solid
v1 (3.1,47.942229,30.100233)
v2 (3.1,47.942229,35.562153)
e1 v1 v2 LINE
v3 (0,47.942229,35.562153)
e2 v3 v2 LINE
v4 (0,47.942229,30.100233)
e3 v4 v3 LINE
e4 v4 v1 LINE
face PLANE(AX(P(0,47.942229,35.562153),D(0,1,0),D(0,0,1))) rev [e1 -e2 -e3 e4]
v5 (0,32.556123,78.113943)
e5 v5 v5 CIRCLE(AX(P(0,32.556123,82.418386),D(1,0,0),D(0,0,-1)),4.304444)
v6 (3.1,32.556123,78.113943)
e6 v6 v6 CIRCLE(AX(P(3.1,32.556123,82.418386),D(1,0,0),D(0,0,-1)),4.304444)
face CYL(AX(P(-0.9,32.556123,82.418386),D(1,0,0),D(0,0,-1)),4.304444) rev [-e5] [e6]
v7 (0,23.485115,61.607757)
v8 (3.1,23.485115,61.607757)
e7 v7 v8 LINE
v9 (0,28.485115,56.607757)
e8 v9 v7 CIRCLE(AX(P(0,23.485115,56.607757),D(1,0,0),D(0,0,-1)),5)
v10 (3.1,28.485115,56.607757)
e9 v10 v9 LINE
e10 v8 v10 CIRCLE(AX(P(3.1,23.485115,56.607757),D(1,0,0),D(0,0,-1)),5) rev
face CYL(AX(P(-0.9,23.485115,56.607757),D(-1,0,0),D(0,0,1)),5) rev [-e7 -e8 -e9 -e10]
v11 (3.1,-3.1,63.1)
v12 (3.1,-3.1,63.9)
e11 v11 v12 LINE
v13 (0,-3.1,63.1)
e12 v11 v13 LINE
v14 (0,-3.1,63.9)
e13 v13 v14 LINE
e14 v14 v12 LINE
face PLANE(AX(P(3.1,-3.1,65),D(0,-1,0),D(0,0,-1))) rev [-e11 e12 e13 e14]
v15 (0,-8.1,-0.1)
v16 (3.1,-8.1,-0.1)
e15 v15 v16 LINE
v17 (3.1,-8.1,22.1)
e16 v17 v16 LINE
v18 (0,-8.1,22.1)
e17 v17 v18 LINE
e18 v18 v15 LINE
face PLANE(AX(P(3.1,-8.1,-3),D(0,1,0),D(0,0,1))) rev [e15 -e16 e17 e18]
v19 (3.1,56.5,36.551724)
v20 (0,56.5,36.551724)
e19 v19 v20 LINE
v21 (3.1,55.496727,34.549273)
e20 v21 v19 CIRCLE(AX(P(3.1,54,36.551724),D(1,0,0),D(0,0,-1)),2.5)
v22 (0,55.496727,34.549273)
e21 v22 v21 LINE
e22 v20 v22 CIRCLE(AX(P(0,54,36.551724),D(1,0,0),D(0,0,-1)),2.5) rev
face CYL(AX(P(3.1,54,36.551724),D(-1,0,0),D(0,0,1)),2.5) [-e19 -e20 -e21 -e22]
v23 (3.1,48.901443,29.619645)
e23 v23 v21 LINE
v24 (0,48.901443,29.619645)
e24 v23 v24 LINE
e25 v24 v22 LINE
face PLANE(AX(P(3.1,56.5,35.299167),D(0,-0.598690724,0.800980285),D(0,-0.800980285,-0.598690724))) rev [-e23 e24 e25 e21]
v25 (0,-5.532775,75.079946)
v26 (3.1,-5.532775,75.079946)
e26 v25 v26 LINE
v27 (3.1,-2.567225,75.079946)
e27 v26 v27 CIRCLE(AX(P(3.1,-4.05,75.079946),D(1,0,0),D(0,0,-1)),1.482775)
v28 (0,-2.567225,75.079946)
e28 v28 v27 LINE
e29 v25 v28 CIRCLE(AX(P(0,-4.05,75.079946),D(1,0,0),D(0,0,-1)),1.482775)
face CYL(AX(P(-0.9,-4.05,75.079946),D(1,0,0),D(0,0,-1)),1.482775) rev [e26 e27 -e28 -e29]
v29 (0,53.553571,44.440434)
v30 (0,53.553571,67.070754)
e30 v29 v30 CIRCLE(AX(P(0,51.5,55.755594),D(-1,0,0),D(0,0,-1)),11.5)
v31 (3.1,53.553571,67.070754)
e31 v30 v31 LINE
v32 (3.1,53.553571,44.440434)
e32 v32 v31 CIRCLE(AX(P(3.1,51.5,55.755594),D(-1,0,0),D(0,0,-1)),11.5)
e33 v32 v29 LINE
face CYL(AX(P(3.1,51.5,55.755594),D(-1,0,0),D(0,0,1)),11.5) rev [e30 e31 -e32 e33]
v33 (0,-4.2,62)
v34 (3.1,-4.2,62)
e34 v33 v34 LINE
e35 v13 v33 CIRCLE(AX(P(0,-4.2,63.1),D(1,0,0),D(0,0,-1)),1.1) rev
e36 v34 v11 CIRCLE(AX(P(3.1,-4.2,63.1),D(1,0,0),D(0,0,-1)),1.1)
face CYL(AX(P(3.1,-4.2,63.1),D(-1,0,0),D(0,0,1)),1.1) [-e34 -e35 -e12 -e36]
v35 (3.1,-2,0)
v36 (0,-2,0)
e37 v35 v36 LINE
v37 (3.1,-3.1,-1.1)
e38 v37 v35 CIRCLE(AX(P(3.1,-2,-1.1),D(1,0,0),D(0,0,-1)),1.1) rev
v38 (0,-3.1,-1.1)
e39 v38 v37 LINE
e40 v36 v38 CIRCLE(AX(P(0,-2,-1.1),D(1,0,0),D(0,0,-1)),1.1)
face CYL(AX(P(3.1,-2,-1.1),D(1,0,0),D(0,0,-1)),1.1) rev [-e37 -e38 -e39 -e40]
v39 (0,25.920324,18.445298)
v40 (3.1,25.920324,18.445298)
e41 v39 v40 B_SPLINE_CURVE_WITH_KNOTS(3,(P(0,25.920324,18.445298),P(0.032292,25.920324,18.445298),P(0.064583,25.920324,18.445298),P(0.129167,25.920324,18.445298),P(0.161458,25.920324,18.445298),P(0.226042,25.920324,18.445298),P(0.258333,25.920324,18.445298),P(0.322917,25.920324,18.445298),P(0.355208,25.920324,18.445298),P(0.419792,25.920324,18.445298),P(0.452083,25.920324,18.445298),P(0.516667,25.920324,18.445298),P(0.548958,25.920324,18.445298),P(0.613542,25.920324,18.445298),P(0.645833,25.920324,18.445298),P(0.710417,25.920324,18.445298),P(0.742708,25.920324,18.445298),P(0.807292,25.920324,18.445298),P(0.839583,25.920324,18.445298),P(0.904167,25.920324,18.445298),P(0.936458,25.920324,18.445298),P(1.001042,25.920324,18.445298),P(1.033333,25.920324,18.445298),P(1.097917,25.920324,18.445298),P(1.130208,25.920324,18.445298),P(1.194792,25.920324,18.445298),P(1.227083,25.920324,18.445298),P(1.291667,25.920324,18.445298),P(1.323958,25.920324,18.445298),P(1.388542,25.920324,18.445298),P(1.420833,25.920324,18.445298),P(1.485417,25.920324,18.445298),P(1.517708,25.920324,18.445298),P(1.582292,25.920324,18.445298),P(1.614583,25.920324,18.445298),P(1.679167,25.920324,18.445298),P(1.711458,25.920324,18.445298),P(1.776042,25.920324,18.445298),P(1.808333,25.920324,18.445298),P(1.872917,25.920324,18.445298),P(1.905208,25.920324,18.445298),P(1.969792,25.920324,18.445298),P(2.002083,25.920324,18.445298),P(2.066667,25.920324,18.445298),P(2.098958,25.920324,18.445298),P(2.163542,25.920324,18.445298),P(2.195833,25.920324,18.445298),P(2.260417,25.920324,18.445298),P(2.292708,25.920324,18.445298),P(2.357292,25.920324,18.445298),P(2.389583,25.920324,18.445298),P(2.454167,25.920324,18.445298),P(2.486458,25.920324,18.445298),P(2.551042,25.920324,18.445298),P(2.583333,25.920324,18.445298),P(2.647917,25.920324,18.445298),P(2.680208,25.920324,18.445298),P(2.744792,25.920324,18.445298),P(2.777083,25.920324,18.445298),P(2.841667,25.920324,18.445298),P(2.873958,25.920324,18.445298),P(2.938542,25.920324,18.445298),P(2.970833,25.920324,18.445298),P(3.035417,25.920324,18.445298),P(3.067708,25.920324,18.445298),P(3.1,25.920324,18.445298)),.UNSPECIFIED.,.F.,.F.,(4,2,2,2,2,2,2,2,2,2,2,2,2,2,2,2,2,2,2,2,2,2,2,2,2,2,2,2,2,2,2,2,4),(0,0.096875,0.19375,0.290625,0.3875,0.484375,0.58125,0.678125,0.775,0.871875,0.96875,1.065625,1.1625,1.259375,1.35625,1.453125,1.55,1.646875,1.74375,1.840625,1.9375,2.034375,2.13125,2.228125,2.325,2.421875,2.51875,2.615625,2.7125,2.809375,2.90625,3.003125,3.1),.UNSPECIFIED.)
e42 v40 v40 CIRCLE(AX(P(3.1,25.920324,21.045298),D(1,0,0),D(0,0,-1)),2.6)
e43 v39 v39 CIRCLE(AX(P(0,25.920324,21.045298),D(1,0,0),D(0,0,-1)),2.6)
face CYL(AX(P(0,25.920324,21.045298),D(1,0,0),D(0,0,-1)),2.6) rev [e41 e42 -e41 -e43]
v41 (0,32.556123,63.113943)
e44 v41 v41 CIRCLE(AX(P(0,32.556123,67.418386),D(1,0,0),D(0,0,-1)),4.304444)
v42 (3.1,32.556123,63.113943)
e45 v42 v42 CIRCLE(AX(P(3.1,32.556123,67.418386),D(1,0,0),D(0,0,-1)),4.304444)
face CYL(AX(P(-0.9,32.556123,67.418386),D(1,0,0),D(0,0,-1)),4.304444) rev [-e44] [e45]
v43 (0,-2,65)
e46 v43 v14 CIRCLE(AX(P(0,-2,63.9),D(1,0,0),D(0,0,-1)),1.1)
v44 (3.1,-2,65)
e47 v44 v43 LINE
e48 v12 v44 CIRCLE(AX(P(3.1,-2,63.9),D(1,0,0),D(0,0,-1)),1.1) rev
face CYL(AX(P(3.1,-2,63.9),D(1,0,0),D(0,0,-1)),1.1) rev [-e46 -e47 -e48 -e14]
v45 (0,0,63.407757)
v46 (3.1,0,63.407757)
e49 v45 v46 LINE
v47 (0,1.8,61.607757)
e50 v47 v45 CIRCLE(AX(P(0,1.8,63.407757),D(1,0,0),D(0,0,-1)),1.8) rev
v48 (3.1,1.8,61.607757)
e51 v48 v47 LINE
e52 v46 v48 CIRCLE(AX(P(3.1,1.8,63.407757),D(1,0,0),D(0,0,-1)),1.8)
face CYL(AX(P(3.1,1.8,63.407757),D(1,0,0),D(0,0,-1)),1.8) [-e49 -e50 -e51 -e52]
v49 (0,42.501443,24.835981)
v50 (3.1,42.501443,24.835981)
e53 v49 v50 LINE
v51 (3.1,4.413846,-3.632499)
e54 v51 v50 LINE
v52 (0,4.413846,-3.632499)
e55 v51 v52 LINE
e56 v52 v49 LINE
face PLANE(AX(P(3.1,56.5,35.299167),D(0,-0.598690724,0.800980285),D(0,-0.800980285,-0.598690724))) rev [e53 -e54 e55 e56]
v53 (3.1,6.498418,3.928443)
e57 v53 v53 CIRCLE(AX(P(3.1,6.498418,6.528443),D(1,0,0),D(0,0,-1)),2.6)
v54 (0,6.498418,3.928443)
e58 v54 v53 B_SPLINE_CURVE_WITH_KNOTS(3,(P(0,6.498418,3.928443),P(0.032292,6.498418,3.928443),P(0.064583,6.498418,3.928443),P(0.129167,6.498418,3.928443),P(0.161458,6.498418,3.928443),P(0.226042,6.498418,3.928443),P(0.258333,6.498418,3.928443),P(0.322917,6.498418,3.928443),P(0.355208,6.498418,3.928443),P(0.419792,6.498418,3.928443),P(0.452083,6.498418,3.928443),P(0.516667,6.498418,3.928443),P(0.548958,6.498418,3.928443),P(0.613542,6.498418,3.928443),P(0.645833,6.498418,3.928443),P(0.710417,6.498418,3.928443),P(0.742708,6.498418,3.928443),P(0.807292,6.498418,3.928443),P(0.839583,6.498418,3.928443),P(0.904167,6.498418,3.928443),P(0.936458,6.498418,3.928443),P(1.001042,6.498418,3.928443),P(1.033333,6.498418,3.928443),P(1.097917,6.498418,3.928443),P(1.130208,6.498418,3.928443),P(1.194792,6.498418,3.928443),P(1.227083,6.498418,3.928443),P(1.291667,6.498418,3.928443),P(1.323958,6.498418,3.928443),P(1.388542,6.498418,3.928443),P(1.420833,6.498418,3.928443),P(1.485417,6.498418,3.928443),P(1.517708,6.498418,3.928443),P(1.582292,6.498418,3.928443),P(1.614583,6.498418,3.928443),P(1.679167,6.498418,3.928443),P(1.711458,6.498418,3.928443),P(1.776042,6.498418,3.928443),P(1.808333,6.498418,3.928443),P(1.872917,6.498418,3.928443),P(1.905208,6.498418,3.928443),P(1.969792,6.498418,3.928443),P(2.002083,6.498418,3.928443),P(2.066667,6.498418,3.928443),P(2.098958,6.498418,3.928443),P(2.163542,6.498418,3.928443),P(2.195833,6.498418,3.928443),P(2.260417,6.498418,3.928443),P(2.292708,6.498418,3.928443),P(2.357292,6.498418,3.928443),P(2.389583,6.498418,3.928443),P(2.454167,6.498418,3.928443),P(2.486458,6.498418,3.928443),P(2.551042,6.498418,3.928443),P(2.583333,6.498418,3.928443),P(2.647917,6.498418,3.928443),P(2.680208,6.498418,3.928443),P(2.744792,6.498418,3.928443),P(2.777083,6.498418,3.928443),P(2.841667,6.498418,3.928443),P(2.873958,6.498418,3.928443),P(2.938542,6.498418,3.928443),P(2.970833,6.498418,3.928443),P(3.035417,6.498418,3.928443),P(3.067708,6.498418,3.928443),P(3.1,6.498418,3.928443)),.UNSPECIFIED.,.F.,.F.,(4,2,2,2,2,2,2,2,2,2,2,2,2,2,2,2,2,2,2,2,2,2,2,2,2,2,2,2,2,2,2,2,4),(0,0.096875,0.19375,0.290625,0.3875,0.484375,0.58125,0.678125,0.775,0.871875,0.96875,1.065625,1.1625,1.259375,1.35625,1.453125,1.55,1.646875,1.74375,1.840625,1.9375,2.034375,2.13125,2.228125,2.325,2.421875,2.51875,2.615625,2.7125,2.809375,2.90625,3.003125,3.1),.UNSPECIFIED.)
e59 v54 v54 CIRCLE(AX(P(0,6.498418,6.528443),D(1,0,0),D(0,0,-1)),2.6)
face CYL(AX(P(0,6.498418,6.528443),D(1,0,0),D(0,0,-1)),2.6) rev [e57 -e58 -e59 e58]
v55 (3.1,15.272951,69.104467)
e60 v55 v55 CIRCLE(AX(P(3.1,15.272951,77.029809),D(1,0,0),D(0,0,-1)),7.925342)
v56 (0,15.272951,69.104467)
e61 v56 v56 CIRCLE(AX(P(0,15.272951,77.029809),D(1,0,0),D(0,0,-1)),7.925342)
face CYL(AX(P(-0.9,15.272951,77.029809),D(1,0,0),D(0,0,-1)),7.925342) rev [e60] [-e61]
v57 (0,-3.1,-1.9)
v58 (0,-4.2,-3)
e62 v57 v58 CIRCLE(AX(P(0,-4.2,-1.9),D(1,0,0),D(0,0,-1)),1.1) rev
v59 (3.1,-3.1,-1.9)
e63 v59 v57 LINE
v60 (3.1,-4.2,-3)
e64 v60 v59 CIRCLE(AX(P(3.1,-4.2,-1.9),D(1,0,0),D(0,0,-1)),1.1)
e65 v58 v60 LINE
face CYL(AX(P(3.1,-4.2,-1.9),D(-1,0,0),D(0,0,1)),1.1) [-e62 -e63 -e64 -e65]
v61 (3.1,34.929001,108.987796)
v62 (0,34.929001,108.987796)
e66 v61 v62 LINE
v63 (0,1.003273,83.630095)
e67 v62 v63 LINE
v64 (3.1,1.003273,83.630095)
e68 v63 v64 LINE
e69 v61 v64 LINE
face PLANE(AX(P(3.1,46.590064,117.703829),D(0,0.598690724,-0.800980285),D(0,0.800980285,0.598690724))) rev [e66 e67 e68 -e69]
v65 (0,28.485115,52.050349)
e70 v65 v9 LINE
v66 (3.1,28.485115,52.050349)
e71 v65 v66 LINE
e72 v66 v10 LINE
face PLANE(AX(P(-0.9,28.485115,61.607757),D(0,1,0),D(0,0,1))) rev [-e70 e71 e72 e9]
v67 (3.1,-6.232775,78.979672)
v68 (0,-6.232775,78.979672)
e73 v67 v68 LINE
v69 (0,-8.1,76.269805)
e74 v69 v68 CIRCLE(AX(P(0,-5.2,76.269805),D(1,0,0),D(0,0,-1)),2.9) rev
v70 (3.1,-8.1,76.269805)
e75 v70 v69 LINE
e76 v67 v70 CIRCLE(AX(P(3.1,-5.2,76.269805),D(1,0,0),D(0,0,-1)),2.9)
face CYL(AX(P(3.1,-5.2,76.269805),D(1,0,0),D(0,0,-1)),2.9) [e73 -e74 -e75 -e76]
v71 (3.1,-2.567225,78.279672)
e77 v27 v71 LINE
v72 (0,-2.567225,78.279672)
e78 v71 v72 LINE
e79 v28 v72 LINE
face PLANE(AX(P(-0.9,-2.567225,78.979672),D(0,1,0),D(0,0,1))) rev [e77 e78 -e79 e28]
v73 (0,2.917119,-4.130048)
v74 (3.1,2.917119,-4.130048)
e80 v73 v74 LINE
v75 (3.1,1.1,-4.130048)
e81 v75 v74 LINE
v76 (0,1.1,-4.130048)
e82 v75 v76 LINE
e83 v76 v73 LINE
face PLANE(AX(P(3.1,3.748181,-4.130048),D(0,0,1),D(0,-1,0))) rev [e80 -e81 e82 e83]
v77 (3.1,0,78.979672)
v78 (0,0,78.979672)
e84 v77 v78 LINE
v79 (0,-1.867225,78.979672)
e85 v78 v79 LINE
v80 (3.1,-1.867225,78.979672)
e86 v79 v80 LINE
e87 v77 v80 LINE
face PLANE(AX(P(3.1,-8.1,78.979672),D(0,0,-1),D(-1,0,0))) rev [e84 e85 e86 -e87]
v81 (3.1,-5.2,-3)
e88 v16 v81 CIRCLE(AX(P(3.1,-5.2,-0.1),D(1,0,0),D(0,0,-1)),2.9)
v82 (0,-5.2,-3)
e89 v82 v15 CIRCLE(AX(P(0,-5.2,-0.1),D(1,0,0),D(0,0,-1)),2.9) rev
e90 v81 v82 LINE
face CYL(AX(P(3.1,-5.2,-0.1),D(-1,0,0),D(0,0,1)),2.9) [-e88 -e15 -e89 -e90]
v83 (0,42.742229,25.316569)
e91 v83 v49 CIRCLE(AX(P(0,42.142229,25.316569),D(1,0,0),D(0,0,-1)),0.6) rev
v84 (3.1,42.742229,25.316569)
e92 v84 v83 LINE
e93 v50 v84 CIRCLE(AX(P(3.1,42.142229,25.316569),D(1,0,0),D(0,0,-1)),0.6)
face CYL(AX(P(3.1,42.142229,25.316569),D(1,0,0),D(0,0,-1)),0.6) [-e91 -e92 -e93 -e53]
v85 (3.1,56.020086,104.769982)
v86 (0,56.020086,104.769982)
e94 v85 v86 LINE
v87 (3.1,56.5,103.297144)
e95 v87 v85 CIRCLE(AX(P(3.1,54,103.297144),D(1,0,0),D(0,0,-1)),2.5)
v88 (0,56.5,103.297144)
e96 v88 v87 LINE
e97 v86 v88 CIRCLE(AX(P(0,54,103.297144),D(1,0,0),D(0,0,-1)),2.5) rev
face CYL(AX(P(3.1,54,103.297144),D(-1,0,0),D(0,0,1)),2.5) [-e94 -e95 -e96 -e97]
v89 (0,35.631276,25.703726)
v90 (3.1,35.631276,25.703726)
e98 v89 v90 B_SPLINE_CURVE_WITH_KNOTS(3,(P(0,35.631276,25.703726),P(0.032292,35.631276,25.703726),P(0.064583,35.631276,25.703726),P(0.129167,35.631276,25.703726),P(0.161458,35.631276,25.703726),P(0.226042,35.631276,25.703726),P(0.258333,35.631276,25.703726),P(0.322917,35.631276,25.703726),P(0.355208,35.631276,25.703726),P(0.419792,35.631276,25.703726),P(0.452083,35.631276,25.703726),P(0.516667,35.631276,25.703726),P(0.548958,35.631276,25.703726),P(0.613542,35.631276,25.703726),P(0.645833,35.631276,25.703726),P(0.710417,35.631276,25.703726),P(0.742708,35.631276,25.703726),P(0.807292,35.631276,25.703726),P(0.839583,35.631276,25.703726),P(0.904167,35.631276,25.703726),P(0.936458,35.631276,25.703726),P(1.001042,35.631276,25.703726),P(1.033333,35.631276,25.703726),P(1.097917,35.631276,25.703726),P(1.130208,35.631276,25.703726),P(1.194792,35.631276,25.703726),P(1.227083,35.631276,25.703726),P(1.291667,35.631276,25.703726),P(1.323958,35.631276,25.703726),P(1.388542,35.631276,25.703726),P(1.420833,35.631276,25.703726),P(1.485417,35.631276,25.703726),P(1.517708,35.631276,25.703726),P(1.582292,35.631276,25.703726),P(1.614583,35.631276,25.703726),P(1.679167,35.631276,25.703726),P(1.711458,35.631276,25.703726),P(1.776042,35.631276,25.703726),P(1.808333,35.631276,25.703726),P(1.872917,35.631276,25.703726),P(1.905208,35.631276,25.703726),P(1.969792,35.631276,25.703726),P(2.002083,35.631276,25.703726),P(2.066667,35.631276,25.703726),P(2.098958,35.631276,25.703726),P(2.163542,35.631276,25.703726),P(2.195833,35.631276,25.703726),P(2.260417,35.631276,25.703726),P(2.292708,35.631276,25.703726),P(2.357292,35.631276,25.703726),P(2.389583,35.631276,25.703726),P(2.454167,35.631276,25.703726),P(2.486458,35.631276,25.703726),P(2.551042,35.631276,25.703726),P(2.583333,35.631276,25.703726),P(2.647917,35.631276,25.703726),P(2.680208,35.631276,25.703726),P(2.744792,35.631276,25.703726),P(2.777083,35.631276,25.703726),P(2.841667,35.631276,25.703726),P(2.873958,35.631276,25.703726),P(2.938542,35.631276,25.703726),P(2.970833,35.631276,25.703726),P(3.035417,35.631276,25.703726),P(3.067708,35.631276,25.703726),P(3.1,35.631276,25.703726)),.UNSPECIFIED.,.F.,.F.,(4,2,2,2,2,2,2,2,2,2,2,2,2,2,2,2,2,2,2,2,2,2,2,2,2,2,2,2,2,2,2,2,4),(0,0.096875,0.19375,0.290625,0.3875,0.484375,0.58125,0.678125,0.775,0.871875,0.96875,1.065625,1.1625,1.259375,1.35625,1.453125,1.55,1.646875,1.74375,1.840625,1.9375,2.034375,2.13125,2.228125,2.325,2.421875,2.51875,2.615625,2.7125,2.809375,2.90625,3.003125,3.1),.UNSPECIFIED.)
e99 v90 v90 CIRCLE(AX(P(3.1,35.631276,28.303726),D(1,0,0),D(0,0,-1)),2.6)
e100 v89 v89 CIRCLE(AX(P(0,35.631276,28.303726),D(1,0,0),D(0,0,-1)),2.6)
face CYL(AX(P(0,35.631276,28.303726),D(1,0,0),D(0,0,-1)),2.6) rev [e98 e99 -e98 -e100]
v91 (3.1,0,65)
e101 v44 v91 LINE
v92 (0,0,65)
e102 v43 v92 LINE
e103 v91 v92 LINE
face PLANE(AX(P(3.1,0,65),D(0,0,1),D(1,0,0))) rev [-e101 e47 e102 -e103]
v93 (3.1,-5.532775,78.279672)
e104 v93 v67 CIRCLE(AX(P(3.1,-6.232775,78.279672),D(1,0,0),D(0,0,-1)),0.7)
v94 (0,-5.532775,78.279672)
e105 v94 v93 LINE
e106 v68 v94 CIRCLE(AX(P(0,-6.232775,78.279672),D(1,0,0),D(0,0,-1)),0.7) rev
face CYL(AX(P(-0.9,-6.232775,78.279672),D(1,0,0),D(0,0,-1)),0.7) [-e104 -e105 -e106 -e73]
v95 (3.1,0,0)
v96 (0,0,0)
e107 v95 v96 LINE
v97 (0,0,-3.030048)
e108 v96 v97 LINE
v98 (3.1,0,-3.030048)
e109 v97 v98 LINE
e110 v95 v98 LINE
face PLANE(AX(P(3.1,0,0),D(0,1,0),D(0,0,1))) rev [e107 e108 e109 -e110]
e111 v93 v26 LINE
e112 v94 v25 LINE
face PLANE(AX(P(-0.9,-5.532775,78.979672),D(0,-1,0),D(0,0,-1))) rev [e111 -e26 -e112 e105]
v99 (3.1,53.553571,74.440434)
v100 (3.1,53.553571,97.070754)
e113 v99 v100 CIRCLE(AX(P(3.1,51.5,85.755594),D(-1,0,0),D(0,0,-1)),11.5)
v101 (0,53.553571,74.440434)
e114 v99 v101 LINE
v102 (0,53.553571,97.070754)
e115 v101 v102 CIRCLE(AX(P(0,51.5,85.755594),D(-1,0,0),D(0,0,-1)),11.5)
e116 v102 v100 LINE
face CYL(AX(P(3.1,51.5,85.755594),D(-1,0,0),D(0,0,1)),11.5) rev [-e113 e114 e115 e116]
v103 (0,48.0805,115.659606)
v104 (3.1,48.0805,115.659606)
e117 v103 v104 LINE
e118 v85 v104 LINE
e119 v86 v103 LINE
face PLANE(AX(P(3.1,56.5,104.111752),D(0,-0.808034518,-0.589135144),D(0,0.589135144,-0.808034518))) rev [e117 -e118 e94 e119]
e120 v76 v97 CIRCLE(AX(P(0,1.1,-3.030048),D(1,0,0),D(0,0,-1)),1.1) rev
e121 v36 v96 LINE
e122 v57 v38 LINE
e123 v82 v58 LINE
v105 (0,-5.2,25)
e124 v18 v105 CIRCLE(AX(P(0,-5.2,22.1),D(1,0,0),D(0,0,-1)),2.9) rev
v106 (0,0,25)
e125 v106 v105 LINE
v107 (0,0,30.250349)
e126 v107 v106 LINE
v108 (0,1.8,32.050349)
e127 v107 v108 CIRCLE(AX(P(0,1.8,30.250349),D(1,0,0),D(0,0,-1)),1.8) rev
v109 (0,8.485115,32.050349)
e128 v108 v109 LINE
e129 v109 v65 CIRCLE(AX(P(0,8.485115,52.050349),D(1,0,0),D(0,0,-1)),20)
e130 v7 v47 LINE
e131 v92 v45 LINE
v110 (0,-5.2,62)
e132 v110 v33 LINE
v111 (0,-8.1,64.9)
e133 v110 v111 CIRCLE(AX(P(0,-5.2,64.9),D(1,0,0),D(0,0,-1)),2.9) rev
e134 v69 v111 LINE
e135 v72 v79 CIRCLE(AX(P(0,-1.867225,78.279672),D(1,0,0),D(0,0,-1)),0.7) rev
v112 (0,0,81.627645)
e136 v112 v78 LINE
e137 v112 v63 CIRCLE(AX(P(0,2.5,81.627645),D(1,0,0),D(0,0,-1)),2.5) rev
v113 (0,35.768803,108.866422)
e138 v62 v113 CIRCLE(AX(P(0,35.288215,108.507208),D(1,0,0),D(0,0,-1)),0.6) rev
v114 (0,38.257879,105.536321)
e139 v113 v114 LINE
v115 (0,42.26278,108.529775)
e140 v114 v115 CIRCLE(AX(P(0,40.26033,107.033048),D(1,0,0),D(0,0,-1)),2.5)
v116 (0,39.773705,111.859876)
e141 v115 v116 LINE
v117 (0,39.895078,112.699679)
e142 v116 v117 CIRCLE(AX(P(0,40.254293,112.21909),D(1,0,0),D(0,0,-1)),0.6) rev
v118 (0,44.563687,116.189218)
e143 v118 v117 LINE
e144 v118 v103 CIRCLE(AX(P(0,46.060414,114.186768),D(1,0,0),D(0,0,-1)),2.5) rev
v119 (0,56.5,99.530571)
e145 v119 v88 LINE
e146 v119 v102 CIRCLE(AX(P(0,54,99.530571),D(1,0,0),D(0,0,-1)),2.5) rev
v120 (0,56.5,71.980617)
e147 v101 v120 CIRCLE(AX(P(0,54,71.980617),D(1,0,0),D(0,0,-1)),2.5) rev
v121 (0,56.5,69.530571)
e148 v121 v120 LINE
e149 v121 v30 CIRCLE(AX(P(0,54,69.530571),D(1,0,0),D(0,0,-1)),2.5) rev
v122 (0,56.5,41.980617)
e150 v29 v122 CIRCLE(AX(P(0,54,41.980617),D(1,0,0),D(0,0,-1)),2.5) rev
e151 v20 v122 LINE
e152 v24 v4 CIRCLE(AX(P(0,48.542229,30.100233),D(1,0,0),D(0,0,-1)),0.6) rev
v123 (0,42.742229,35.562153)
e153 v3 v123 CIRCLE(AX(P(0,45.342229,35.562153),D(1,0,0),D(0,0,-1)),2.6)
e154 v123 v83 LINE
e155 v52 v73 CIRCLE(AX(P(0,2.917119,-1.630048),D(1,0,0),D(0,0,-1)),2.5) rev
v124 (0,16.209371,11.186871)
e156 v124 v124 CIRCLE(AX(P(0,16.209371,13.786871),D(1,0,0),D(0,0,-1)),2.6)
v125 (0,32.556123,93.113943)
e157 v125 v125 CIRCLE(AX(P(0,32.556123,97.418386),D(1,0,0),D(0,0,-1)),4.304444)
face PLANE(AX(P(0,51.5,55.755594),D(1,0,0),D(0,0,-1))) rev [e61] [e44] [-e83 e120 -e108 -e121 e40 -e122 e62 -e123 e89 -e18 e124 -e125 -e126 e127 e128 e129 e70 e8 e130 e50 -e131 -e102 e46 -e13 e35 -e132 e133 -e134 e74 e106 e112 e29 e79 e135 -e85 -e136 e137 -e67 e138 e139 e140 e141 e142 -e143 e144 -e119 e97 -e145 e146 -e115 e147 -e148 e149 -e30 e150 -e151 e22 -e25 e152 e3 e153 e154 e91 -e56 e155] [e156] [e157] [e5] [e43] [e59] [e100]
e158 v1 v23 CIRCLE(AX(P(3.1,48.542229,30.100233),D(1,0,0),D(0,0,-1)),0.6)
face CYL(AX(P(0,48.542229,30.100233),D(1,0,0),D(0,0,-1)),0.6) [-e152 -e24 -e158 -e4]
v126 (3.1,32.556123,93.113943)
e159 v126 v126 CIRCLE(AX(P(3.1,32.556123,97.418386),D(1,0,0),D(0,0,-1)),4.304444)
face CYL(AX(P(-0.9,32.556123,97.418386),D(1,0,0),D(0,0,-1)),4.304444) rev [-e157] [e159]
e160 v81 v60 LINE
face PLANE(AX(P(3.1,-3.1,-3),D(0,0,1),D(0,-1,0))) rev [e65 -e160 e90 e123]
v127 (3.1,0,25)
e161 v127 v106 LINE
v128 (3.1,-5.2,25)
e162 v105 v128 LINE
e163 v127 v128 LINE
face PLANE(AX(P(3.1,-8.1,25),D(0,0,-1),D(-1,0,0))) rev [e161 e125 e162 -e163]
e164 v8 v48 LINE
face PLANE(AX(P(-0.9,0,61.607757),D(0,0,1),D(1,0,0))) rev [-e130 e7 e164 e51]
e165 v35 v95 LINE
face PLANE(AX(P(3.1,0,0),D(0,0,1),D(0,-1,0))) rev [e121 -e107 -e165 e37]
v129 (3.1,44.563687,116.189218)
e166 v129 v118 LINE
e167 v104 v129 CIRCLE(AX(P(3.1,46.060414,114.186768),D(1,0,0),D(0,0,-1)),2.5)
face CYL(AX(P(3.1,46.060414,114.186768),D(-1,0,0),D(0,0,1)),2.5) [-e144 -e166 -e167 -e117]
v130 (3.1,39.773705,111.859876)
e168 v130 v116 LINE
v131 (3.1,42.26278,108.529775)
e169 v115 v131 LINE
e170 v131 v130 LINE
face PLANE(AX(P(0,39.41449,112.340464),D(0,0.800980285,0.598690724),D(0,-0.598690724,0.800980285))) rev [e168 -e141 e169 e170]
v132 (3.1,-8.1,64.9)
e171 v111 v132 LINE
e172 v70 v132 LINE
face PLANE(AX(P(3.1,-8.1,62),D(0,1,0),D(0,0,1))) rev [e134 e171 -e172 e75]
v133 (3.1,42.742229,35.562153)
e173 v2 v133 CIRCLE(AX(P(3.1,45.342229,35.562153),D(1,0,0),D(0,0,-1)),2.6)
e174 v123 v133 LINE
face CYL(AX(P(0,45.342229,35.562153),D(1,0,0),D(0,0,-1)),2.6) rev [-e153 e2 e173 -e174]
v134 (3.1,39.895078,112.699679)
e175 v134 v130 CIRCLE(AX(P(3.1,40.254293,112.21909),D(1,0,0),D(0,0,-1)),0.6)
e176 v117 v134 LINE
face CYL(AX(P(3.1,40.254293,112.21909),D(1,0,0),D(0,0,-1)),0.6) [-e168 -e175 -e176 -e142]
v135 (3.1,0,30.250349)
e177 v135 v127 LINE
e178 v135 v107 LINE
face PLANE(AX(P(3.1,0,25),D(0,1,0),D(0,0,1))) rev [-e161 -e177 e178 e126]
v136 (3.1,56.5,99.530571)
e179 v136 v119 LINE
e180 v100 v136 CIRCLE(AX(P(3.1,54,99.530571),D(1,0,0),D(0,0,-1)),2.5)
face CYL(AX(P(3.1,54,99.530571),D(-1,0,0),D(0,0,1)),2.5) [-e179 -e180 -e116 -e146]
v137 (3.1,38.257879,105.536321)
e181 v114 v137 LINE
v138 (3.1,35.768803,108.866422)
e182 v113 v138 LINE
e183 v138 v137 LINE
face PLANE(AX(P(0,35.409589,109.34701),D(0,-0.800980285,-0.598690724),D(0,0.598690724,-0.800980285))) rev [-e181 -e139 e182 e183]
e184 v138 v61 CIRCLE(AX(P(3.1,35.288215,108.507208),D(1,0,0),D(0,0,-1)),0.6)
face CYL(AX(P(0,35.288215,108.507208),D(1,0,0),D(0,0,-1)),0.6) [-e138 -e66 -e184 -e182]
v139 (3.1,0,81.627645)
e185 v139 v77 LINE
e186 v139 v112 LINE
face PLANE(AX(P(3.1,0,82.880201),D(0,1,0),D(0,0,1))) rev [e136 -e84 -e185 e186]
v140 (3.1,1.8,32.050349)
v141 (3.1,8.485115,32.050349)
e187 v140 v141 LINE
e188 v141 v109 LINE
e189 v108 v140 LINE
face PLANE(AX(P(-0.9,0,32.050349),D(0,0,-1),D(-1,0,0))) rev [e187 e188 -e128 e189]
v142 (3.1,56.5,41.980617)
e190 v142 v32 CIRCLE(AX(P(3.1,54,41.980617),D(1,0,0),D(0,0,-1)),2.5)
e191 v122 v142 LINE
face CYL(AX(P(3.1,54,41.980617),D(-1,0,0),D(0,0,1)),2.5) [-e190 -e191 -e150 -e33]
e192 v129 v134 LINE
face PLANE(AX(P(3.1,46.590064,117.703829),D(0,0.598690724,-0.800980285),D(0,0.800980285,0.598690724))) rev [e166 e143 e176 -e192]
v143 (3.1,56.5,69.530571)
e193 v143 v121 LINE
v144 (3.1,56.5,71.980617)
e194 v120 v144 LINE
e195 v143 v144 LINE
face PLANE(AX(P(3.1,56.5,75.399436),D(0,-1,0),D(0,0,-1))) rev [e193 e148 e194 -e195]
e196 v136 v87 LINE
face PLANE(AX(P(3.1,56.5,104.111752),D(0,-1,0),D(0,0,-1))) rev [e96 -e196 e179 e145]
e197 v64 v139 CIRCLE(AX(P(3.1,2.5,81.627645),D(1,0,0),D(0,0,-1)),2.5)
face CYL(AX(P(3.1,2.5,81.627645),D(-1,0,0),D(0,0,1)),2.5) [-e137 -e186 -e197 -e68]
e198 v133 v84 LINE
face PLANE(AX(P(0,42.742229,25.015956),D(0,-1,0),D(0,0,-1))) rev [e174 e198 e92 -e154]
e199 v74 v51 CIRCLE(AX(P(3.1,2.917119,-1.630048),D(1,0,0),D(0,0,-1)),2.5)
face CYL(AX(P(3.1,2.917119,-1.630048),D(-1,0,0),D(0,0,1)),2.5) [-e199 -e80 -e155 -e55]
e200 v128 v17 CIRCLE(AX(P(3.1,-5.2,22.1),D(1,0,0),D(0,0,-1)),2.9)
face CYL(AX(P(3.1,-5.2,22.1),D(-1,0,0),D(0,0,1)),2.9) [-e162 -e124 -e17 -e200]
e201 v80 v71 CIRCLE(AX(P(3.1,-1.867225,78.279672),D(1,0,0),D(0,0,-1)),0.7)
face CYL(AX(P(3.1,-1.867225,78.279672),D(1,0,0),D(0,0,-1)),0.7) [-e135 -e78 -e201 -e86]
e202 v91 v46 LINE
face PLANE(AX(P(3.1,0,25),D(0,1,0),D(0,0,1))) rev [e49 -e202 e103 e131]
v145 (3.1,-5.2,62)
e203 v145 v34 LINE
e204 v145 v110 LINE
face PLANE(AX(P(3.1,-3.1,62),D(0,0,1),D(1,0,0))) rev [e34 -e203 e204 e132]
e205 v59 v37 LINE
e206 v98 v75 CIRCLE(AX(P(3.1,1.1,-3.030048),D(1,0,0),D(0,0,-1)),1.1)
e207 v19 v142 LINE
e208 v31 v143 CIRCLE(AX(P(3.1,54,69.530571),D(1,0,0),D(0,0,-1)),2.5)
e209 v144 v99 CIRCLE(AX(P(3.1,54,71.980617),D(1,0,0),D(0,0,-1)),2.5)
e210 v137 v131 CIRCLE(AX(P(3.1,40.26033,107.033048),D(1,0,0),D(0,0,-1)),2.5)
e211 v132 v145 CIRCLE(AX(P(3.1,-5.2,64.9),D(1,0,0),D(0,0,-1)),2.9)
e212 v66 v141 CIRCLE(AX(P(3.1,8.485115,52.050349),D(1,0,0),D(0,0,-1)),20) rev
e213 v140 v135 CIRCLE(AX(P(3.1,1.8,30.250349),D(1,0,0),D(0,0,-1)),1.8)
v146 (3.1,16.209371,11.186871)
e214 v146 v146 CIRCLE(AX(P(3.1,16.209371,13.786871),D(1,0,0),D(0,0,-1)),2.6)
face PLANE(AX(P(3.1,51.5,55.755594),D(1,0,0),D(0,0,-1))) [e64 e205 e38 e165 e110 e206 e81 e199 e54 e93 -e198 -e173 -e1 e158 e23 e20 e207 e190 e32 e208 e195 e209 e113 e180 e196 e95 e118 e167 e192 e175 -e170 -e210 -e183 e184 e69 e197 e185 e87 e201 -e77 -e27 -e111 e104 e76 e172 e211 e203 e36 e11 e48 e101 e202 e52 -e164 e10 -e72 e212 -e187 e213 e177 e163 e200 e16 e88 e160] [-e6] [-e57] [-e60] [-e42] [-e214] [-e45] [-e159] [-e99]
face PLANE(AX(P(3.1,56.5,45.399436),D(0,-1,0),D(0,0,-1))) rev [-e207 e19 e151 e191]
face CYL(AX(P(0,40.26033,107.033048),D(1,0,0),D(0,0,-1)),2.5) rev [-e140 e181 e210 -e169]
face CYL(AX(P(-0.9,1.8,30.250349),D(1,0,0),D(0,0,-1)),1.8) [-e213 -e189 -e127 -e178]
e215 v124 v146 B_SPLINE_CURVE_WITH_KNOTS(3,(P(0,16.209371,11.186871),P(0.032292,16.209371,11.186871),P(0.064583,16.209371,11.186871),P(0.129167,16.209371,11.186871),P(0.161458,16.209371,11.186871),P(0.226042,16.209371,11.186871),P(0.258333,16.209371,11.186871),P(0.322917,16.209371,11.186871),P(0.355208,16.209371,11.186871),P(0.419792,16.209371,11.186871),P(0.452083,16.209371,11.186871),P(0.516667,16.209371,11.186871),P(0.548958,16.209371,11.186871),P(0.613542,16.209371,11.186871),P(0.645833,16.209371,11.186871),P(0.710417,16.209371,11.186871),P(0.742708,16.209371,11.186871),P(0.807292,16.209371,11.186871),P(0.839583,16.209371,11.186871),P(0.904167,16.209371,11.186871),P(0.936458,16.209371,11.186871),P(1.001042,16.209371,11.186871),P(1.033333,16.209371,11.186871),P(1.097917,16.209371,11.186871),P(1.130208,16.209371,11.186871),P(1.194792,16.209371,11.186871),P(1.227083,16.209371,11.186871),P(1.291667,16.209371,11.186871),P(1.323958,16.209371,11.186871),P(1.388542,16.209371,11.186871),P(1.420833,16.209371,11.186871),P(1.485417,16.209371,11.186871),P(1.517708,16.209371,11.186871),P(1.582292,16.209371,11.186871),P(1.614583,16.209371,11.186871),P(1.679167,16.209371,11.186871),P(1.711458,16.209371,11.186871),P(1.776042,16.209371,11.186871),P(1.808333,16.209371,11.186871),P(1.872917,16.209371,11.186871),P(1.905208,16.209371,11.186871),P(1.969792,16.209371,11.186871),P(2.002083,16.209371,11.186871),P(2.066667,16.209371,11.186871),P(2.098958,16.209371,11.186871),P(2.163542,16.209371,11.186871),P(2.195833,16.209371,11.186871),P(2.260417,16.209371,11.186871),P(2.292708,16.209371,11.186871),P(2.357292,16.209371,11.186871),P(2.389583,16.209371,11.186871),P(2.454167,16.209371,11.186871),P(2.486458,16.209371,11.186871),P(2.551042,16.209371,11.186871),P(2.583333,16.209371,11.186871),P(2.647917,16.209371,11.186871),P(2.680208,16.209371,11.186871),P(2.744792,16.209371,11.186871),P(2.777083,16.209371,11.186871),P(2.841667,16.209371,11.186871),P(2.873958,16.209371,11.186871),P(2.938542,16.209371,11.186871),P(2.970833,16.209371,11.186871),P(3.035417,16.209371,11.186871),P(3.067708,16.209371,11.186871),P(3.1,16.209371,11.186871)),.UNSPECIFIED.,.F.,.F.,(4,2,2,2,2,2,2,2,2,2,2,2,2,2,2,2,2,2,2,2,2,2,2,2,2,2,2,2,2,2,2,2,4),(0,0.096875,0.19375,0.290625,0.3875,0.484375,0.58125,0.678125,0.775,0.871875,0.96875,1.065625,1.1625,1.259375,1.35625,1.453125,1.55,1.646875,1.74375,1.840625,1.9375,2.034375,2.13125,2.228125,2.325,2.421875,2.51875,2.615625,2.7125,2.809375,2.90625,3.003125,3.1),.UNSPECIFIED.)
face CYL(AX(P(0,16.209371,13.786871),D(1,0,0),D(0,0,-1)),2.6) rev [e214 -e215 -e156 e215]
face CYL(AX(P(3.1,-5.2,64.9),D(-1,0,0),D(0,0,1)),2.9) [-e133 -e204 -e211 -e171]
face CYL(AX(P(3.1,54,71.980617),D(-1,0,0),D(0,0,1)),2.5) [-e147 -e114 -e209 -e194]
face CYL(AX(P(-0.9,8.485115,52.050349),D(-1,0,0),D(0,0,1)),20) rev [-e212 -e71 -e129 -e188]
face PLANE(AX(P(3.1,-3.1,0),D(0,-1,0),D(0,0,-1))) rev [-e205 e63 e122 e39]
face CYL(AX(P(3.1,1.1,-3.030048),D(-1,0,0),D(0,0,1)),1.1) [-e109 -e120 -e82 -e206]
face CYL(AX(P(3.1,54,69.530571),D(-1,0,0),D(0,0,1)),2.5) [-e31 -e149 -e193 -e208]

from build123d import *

# Parameters (mm, degrees)
BOSS_EXTRUDE1_DEPTH = 3.1
FILLET1_R           = 2.5
FILLET2_R           = 1.1
SKETCH2_R           = 4.304443881
SKETCH2_R_2         = 7.925342076
SKETCH2_W           = 29.557408324
SKETCH2_H           = 28.485114527
CUT_EXTRUDE1_DEPTH  = 4
FILLET3_R           = 0.7
FILLET4_R           = 1.1
FILLET5_R           = 2.9
FILLET6_R           = 20
FILLET7_R           = 5
FILLET8_R           = 1.8
SKETCH4_R           = 2.6
CUT_EXTRUDE2_DEPTH  = 130.682927753
FILLET9_R           = 0.6


with BuildPart() as part:
    # Sketch1 → Boss-Extrude1 (new body)
    with BuildSketch(Plane(origin=(0, 0, 0), x_dir=(0, 0, -1), z_dir=(1, 0, 0))):
        with BuildLine():
            Line((0, 0), (0, -3.1))
            Line((0, -3.1), (3, -3.1))
            Line((3, -3.1), (3, -8.1))
            Line((3, -8.1), (-25, -8.1))
            Line((-25, -8.1), (-25, 0))
            Line((-25, 0), (-65, 0))
            Line((-65, 0), (-65, -3.1))
            Line((-65, -3.1), (-62, -3.1))
            Line((-62, -3.1), (-62, -8.1))
            Line((-62, -8.1), (-78.979671767, -8.1))
            Line((-78.979671767, -8.1), (-78.979671767, 0))
            Line((-78.979671767, 0), (-82.880201339, 0))
            Line((-82.880201339, 0), (-117.70382886, 46.590063892))
            Line((-117.70382886, 46.590063892), (-104.111751507, 56.5))
            Line((-104.111751507, 56.5), (-96.111751507, 56.5))
            ThreePointArc((-96.111751507, 56.5), (-85.755593918, 40), (-75.39943633, 56.5))
            Line((-75.39943633, 56.5), (-66.111751507, 56.5))
            ThreePointArc((-66.111751507, 56.5), (-55.755593918, 40), (-45.39943633, 56.5))
            Line((-45.39943633, 56.5), (-35.299167427, 56.5))
            Line((-35.299167427, 56.5), (4.130048311, 3.748181445))
            Line((4.130048311, 3.748181445), (4.130048311, 0))
            Line((4.130048311, 0), (0, 0))
        make_face()
    extrude(amount=BOSS_EXTRUDE1_DEPTH)

    # Fillet1
    fillet1_edges = [part.edges().sort_by_distance(p)[0] for p in [
        (1.55, 0, 82.880201339),
        (1.55, 46.590063892, 117.70382886),
        (1.55, 56.5, 104.111751507),
        (1.55, 56.5, 96.111751507),
        (1.55, 56.5, 75.39943633),
        (1.55, 56.5, 66.111751507),
        (1.55, 56.5, 45.39943633),
        (1.55, 56.5, 35.299167427),
        (1.55, 3.748181445, -4.130048311),
    ]]
    fillet(fillet1_edges, radius=FILLET1_R)

    # Fillet2
    fillet2_edges = [part.edges().sort_by_distance(p)[0] for p in [
        (1.55, 0, -4.130048311),
    ]]
    fillet(fillet2_edges, radius=FILLET2_R)

    # Sketch2 → Cut-Extrude1 (cut)
    with BuildSketch(Plane(origin=(3.1, 0, 0), x_dir=(0, 0, -1), z_dir=(1, 0, 0))):
        with Locations((-97.418386441, 32.55612307)):
            Circle(SKETCH2_R)
        with Locations((-77.029808816, 15.272951492)):
            Circle(SKETCH2_R_2)
        with Locations((-82.418386441, 32.55612307)):
            Circle(SKETCH2_R)
        with Locations((-67.418386441, 32.55612307)):
            Circle(SKETCH2_R)
        with BuildLine():
            Line((-78.979671767, -2.567225462), (-75.079945866, -2.567225462))
            ThreePointArc((-75.079945866, -2.567225462), (-73.597171327, -4.05), (-75.079945866, -5.532774538))
            Line((-75.079945866, -5.532774538), (-78.979671767, -5.532774538))
            ThreePointArc((-78.979671767, -5.532774538), (-80.462446305, -4.05), (-78.979671767, -2.567225462))
        make_face()
        with Locations((-46.829052789, 14.242557264)):
            Rectangle(SKETCH2_W, SKETCH2_H)
    extrude(amount=-CUT_EXTRUDE1_DEPTH, mode=Mode.SUBTRACT)

    # Fillet3
    fillet3_edges = [part.edges().sort_by_distance(p)[0] for p in [
        (1.55, -2.567225462, 78.979671767),
        (1.55, -5.532774538, 78.979671767),
    ]]
    fillet(fillet3_edges, radius=FILLET3_R)

    # Fillet4
    fillet4_edges = [part.edges().sort_by_distance(p)[0] for p in [
        (1.55, -3.1, 0),
        (1.55, -3.1, -3),
        (1.55, -3.1, 65),
        (1.55, -3.1, 62),
    ]]
    fillet(fillet4_edges, radius=FILLET4_R)

    # Fillet5
    # the kernel refuses this fillet: 2.9 mm, written as the material it takes off along each edge
    with BuildSketch(Plane(origin=(-7.25, -8.1, -3), x_dir=(0, 0, 1), z_dir=(1, 0, 0)), Plane(origin=(-7.25, -8.1, 25), x_dir=(0, 1, 0), z_dir=(1, 0, 0))) as fillet5_piece_1:
        with BuildLine():
            CenterArc((FILLET5_R, -FILLET5_R), FILLET5_R, 90, 90)
            Line((0, -FILLET5_R), (0, 0))
            Line((0, 0), (FILLET5_R, 0))
        make_face()
    extrude(amount=17.6, mode=Mode.SUBTRACT)
    with BuildSketch(Plane(origin=(-7.25, -8.1, 62), x_dir=(0, 1, 0), z_dir=(1, 0, 0))) as fillet5_piece_2:
        with BuildLine():
            CenterArc((FILLET5_R, FILLET5_R), FILLET5_R, 180, 90)
            Line((0, FILLET5_R), (0, 0))
            Line((0, 0), (FILLET5_R, 0))
        make_face()
    extrude(amount=17.6, mode=Mode.SUBTRACT)
    with BuildSketch(Plane(origin=(-6.774666391, -8.1, 78.979671767), x_dir=(0, 0, -1), z_dir=(1, 0, 0))) as fillet5_piece_3:
        with BuildLine():
            CenterArc((2.709866556, 2.9), FILLET5_R, 200.862663323, 69.137336677)
            Line((0, 1.867225462), (0, 0))
            Line((0, 0), (2.709866556, 0))
        make_face()
    extrude(amount=16.649332781, mode=Mode.SUBTRACT)

    # Fillet6
    fillet6_edges = [part.edges().sort_by_distance(p)[0] for p in [
        (1.55, 28.485114527, 32.050348627),
    ]]
    fillet(fillet6_edges, radius=FILLET6_R)

    # Fillet7
    fillet7_edges = [part.edges().sort_by_distance(p)[0] for p in [
        (1.55, 28.485114527, 61.607756951),
    ]]
    fillet(fillet7_edges, radius=FILLET7_R)

    # Fillet8
    fillet8_edges = [part.edges().sort_by_distance(p)[0] for p in [
        (1.55, 0, 61.607756951),
        (1.55, 0, 32.050348627),
    ]]
    fillet(fillet8_edges, radius=FILLET8_R)

    # Sketch4 → Cut-Extrude2 (cut, through all)
    with BuildSketch(Plane(origin=(3.1, 0, 0), x_dir=(0, 0, -1), z_dir=(1, 0, 0))):
        with Locations((-28.303725911, 35.631276326)):
            Circle(SKETCH4_R)
        with Locations((-21.045298439, 25.920323627)):
            Circle(SKETCH4_R)
        with Locations((-13.786870968, 16.209370928)):
            Circle(SKETCH4_R)
        with Locations((-6.528443496, 6.498418229)):
            Circle(SKETCH4_R)
        with BuildLine():
            Line((-35.562153383, 47.942229025), (-28.90268277, 47.942229025))
            Line((-28.90268277, 47.942229025), (-25.015955687, 42.742229025))
            Line((-25.015955687, 42.742229025), (-35.562153383, 42.742229025))
            ThreePointArc((-35.562153383, 42.742229025), (-38.162153383, 45.342229025), (-35.562153383, 47.942229025))
        make_face()
        with BuildLine():
            Line((-112.340464073, 39.414490126), (-108.529774826, 42.262780338))
            ThreePointArc((-108.529774826, 42.262780338), (-105.030597304, 41.757056436), (-105.536321205, 38.257878913))
            Line((-105.536321205, 38.257878913), (-109.347010452, 35.409588702))
            ThreePointArc((-109.347010452, 35.409588702), (-112.846187975, 35.915312603), (-112.340464073, 39.414490126))
        make_face()
    extrude(amount=-CUT_EXTRUDE2_DEPTH, mode=Mode.SUBTRACT)

    # Fillet9
    fillet9_edges = [part.edges().sort_by_distance(p)[0] for p in [
        (1.55, 47.942229025, 28.90268277),
        (1.55, 42.742229025, 25.015955687),
        (1.55, 35.409588702, 109.347010452),
        (1.55, 39.414490126, 112.340464073),
    ]]
    fillet(fillet9_edges, radius=FILLET9_R)


solid = part.part
